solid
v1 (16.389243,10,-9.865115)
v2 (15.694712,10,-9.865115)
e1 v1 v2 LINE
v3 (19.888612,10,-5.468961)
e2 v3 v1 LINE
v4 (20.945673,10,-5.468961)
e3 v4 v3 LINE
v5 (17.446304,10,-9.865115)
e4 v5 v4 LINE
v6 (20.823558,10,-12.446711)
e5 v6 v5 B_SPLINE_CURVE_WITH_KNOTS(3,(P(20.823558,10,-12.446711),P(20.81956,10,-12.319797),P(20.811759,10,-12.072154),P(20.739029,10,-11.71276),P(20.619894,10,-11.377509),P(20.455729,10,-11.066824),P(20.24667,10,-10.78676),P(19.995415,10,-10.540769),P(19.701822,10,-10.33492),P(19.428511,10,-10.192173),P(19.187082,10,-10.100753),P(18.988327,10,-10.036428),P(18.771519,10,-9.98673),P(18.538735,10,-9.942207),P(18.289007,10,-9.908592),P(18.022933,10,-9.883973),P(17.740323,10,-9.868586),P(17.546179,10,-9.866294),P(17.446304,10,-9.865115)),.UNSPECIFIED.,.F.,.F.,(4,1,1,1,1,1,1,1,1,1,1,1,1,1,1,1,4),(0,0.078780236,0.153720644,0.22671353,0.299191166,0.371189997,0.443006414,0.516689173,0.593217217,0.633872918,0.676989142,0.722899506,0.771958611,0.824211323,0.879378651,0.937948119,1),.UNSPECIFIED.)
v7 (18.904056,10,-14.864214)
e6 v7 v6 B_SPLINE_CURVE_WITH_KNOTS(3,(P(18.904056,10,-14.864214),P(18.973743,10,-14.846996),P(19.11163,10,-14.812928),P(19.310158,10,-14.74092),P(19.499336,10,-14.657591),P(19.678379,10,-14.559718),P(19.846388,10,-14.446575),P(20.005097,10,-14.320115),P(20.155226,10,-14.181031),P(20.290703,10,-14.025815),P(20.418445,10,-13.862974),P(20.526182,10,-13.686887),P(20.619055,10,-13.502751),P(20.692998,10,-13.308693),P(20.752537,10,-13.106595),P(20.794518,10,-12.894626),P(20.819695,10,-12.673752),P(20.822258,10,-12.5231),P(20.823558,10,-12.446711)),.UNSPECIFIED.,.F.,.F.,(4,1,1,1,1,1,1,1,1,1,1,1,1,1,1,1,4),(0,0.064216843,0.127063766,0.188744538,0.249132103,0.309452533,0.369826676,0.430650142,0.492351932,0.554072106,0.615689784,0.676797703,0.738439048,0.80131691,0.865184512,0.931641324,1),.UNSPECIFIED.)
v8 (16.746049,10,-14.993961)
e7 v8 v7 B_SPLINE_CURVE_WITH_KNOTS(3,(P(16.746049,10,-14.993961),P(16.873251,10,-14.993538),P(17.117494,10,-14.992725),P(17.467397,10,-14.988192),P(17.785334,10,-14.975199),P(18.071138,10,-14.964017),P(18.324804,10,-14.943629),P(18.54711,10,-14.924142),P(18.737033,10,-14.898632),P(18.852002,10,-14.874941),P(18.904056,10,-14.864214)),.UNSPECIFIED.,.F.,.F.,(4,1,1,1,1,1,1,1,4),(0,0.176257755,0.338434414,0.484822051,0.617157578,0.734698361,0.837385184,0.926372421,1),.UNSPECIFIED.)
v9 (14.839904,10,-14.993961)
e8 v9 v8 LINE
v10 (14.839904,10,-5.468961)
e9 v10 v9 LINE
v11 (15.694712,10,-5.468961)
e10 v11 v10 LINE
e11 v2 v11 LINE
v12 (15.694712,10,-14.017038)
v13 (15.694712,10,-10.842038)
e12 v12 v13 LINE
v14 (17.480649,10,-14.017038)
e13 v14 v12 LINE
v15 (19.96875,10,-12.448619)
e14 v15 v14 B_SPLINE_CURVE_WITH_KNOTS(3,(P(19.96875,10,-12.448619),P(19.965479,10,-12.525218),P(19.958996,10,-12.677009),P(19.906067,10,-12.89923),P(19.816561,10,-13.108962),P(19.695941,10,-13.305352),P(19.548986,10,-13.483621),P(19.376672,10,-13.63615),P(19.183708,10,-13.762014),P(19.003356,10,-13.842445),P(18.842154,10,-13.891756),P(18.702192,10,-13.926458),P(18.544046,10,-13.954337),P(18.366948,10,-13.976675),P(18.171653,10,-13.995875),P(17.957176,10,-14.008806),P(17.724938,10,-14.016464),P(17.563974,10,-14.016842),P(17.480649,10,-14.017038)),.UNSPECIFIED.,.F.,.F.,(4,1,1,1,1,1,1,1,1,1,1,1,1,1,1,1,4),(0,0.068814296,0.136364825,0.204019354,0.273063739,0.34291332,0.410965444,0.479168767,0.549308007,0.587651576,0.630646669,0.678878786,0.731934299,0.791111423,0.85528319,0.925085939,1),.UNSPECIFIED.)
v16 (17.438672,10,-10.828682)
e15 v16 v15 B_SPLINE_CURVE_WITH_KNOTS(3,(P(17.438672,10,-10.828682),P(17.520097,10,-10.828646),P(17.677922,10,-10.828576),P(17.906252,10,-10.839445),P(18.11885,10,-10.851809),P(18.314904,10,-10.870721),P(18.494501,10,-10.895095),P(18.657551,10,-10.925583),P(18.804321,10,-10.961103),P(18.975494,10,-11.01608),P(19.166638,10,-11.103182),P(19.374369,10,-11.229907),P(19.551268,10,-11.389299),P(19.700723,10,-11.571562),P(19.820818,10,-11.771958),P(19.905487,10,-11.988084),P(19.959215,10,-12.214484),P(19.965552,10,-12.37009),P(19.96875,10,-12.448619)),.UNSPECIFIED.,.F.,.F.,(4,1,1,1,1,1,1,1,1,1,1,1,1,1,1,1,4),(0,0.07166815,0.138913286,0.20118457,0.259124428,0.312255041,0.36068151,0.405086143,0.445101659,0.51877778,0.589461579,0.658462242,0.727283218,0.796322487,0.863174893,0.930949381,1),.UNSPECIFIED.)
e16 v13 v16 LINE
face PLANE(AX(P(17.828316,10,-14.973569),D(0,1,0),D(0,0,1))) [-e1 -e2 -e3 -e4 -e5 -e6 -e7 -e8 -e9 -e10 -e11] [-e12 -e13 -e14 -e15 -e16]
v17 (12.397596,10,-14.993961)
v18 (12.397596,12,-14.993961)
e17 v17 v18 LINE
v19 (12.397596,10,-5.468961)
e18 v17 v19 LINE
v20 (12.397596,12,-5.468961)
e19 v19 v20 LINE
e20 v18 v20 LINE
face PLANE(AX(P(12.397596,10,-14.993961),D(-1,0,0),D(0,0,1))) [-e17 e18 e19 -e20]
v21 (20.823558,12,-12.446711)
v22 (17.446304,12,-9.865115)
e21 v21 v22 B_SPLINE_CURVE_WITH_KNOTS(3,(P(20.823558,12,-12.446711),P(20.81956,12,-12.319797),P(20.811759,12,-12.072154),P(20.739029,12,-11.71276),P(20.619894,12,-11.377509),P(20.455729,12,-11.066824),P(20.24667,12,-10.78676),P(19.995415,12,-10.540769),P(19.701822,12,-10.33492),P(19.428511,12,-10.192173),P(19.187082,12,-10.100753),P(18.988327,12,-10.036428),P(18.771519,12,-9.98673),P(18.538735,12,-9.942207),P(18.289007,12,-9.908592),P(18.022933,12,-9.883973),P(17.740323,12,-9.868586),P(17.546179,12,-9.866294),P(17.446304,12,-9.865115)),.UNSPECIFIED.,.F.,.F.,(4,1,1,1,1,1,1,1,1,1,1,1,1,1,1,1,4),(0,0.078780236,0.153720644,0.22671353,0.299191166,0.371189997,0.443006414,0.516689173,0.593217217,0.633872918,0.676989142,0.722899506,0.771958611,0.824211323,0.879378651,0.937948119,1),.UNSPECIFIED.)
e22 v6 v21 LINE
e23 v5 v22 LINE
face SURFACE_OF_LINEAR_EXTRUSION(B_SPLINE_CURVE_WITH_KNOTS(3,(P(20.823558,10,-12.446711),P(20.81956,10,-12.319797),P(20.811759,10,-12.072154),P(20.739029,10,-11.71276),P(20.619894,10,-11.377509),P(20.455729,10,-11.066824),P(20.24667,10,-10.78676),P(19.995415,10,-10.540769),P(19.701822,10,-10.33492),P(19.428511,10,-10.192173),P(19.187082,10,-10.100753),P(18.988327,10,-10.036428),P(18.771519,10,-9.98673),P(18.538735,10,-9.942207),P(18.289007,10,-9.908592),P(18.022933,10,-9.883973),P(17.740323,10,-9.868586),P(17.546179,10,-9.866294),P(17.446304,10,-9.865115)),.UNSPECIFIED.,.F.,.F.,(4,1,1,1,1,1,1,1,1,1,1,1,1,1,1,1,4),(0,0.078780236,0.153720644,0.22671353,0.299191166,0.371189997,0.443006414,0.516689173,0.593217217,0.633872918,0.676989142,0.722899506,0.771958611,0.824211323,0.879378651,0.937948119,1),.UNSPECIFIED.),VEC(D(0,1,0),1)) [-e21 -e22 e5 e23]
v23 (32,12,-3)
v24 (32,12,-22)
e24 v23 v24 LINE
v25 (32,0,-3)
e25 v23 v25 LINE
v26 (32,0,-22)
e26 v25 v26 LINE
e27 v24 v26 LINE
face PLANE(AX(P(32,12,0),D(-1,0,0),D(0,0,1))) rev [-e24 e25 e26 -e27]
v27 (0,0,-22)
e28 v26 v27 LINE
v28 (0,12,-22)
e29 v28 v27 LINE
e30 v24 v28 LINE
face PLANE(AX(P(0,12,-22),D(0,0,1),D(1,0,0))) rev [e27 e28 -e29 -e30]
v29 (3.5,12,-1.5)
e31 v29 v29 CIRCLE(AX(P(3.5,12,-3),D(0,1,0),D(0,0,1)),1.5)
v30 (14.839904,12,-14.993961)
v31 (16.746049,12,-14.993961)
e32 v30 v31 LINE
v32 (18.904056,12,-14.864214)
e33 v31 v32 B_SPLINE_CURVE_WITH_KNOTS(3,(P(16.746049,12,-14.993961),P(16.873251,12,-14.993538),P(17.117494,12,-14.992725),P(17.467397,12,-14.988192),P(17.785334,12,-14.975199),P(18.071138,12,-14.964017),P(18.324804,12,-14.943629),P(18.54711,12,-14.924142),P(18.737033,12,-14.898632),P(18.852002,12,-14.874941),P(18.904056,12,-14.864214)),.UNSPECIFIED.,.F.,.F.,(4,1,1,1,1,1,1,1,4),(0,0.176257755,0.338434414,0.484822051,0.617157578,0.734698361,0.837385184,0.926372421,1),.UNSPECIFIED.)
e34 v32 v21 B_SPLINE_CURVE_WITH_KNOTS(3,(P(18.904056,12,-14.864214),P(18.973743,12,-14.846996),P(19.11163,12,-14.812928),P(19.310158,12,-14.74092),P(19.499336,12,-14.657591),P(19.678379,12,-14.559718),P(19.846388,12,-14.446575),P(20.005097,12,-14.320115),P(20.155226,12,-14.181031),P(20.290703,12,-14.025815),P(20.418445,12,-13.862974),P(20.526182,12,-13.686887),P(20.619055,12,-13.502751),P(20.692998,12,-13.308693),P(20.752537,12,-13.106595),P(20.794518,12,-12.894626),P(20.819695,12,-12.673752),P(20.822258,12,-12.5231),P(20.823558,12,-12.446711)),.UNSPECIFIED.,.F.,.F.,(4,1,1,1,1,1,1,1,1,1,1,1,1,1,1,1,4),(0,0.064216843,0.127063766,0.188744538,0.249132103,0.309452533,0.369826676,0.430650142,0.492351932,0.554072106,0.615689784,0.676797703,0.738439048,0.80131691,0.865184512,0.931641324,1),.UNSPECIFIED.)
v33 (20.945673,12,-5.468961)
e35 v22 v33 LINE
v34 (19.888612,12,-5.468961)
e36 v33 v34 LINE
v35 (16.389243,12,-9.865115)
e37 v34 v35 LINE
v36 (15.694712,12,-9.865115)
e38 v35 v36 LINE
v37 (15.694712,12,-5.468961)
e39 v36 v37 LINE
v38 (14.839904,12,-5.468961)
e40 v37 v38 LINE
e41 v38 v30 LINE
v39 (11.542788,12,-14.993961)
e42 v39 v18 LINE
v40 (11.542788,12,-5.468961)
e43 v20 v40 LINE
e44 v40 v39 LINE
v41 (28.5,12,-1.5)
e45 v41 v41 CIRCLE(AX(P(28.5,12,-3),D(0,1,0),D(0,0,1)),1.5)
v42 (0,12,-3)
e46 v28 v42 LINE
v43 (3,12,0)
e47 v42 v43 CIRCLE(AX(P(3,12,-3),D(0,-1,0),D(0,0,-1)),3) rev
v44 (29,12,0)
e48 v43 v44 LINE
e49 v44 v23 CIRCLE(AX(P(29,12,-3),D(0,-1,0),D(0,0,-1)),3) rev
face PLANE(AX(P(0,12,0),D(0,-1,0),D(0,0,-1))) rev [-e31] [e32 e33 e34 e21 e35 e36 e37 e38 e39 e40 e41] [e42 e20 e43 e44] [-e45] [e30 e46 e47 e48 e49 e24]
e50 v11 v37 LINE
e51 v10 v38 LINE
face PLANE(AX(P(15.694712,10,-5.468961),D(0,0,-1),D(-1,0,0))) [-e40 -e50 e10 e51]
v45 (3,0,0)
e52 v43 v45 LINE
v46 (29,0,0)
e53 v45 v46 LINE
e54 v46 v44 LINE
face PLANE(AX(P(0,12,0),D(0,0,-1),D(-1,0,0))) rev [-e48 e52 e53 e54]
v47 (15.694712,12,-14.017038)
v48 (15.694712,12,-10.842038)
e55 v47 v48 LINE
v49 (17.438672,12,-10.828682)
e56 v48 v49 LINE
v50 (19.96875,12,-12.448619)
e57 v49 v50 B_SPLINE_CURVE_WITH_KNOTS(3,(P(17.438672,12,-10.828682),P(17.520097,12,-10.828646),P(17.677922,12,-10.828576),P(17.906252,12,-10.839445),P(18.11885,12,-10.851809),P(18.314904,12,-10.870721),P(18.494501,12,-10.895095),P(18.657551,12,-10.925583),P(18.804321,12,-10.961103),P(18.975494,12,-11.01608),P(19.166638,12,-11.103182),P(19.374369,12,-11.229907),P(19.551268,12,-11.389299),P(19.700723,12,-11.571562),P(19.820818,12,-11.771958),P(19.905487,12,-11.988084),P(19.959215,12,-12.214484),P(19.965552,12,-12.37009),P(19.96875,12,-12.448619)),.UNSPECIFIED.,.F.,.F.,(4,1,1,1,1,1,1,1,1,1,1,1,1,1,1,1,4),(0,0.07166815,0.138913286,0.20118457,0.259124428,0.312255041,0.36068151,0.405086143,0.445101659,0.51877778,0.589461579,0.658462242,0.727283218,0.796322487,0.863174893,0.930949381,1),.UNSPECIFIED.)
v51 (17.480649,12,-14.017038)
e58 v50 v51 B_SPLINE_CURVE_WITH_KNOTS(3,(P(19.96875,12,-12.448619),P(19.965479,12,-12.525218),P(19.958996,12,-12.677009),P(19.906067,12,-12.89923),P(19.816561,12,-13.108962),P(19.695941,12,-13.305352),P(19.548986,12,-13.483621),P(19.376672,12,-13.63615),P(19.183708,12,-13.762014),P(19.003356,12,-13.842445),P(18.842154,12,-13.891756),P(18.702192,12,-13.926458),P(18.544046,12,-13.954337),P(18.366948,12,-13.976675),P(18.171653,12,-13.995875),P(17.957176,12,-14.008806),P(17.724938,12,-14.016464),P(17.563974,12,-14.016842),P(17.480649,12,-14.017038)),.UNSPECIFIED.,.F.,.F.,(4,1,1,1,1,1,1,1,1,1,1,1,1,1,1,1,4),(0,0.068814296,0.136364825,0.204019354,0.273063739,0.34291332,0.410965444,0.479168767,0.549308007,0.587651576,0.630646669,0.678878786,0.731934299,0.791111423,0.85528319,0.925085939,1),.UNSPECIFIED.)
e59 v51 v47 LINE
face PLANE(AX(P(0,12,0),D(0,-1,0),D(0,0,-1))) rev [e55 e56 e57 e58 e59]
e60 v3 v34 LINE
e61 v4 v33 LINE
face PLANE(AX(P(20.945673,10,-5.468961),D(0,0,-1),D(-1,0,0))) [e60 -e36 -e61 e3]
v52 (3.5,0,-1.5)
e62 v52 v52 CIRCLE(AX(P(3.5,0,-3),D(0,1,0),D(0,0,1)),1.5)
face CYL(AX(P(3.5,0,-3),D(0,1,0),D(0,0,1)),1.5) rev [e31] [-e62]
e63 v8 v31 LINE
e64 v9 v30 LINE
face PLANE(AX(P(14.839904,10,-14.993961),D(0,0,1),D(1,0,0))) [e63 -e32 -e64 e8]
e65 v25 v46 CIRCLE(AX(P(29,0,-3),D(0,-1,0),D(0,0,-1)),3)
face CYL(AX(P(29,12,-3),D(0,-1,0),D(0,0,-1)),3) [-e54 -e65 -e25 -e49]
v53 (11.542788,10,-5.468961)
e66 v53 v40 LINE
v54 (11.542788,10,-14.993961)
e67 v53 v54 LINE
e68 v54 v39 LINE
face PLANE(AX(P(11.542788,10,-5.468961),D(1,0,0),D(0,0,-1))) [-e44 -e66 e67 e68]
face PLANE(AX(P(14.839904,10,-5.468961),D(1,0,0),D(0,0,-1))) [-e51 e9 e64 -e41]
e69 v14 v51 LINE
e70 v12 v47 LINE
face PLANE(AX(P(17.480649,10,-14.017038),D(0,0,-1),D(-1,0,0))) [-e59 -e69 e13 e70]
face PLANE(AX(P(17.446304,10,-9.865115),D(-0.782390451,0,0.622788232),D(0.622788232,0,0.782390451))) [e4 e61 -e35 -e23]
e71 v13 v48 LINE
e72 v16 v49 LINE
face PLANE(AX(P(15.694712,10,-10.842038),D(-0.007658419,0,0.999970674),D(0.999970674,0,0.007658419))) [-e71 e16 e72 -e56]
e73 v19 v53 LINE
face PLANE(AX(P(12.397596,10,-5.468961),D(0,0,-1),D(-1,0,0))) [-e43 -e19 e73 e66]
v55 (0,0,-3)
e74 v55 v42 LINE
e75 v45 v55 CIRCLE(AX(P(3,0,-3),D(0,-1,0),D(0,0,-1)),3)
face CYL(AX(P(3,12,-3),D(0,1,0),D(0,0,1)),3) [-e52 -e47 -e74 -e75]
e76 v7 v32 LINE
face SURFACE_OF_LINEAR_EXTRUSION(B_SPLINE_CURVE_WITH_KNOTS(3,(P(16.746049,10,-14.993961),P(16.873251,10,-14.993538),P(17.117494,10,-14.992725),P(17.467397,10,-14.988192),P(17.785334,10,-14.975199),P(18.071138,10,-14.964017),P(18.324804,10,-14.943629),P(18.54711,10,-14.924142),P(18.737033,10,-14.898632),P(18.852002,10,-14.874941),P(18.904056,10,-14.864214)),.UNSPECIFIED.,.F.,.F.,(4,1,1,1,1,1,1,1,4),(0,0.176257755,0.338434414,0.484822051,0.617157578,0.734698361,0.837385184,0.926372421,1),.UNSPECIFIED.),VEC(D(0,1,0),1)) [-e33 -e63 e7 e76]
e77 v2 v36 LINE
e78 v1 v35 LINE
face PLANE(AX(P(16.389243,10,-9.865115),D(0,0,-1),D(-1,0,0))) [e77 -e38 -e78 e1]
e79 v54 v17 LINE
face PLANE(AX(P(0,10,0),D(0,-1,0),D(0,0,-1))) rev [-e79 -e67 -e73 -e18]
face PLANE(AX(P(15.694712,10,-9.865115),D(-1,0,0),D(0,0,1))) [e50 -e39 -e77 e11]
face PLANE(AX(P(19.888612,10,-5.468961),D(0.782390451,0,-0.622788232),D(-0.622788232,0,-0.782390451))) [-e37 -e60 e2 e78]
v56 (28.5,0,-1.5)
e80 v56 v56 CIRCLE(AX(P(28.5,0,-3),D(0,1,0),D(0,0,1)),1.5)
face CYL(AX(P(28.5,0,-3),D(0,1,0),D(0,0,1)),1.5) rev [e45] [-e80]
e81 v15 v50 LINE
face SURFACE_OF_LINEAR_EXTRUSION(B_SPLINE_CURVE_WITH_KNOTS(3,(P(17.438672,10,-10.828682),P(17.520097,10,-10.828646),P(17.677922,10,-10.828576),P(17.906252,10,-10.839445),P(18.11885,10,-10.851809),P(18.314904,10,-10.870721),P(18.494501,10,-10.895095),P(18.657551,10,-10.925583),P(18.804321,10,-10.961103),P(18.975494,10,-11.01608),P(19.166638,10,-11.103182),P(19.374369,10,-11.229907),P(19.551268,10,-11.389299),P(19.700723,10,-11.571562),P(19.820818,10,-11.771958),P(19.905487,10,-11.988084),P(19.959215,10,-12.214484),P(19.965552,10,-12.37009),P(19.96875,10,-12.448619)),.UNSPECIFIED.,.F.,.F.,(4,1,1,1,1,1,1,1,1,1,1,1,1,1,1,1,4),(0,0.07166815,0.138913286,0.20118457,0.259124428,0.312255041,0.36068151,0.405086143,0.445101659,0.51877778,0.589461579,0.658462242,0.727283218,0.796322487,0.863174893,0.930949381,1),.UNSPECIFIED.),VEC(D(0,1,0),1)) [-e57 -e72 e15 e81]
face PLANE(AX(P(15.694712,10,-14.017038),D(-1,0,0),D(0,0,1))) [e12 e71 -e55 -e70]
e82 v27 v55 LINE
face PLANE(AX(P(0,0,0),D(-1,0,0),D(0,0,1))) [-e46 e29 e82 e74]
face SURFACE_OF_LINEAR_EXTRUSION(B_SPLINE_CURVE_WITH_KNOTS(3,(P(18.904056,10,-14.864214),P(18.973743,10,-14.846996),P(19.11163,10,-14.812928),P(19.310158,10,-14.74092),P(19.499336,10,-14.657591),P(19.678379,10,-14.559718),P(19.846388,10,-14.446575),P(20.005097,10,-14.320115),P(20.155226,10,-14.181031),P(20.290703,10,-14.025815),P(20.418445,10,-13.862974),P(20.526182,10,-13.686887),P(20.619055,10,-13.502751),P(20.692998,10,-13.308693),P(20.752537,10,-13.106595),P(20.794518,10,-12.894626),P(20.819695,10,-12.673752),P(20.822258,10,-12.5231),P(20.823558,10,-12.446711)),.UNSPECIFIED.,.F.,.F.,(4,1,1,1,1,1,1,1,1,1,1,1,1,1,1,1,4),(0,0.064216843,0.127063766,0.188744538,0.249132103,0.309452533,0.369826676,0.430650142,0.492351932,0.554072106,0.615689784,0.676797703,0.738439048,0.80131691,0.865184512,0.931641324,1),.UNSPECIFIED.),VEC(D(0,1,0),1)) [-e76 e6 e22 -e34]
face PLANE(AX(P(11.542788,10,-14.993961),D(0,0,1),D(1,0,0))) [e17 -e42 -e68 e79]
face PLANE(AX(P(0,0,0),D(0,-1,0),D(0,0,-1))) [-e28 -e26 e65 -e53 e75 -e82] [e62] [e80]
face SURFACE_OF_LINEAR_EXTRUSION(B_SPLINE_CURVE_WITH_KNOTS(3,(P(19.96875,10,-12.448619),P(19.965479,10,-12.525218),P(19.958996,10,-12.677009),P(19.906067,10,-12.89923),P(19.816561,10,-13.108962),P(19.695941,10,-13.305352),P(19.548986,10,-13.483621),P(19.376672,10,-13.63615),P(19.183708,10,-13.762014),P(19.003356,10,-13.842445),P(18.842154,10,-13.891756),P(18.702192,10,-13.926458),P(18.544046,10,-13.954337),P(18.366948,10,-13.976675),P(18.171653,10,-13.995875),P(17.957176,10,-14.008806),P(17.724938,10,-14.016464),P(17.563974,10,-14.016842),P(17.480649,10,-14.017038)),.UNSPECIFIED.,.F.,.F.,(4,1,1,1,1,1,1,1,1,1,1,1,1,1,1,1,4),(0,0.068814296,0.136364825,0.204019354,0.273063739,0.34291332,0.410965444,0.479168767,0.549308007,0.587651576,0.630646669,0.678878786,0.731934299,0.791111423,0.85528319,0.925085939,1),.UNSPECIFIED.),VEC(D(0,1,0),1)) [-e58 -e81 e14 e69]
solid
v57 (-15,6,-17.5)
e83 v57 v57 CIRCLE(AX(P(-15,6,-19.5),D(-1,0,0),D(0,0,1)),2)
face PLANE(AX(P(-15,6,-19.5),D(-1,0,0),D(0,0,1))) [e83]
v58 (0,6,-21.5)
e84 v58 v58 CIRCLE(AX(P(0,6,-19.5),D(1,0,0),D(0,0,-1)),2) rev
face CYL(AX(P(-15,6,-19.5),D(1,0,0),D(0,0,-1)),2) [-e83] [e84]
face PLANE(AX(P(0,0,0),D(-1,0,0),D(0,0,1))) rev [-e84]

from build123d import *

# Parameters (mm, degrees)
SKETCH1_W           = 32
SKETCH1_H           = 22
BOSS_EXTRUDE1_DEPTH = 12
SKETCH2_R           = 2
BOSS_EXTRUDE2_DEPTH = 15
SKETCH3_R           = 1.5
CUT_EXTRUDE1_DEPTH  = 41.644802866
SKETCH4_W           = 0.854807692
SKETCH4_H           = 9.525
CUT_EXTRUDE2_DEPTH  = 2
FILLET1_R           = 3


with BuildPart() as part:
    # Sketch1 → Boss-Extrude1 (new body)
    with BuildSketch(Plane(origin=(0, 0, 0), x_dir=(1, 0, 0), z_dir=(0, 1, 0))):
        with Locations((16, 11)):
            Rectangle(SKETCH1_W, SKETCH1_H)
    extrude(amount=BOSS_EXTRUDE1_DEPTH)

    # Sketch2 → Boss-Extrude2 (add)
    with BuildSketch(Plane.ZY):
        with Locations((-19.5, 6)):
            Circle(SKETCH2_R)
    extrude(amount=BOSS_EXTRUDE2_DEPTH)

    # Sketch3 → Cut-Extrude1 (cut, through all)
    with BuildSketch(Plane(origin=(0, 12, 0), x_dir=(1, 0, 0), z_dir=(0, 1, 0))):
        with Locations((3.5, 3)):
            Circle(SKETCH3_R)
        with Locations((28.5, 3)):
            Circle(SKETCH3_R)
    extrude(amount=-CUT_EXTRUDE1_DEPTH, mode=Mode.SUBTRACT)

    # Sketch4 → Cut-Extrude2 (cut)
    # profile 1 of 2: a face of its own
    with BuildSketch(Plane(origin=(0, 12, 0), x_dir=(1, 0, 0), z_dir=(0, 1, 0))):
        with Locations((11.970192308, 10.231461459)):
            Rectangle(SKETCH4_W, SKETCH4_H)
    # profile 2 of 2: a face of its own
    with BuildSketch(Plane(origin=(0, 12, 0), x_dir=(1, 0, 0), z_dir=(0, 1, 0))):
        with BuildLine():
            Line((14.839903846, 14.993961459), (16.746048678, 14.993961459))
            add(Edge.make_bspline(
                [(16.746048678, 14.993961459), (16.87325132, 14.993538043), (17.117494485, 14.992725037), (17.467397456, 14.988191782), (17.785334056, 14.975198714), (18.071138047, 14.964017498), (18.324804187, 14.943628715), (18.547110314, 14.924141525), (18.737032548, 14.898631777), (18.852001615, 14.87494059), (18.90405649, 14.864213863)],
                knots=[0, 0, 0, 0, 1.410062039, 2.707475311, 3.878576406, 4.937260626, 5.877586885, 6.699081471, 7.410979367, 8, 8, 8, 8], degree=3))
            add(Edge.make_bspline(
                [(18.90405649, 14.864213863), (18.973743089, 14.846996023), (19.111629682, 14.812927646), (19.310158076, 14.740919733), (19.499336343, 14.657590611), (19.678378651, 14.559717915), (19.846388197, 14.446575122), (20.005097314, 14.320115446), (20.155226182, 14.181030836), (20.290703333, 14.025814589), (20.418444609, 13.862973802), (20.526182228, 13.686887149), (20.619055005, 13.502751135), (20.692997627, 13.308693091), (20.752536969, 13.106594983), (20.794518377, 12.894626186), (20.819694824, 12.67375239), (20.822258016, 12.523099795), (20.823557692, 12.446710858)],
                knots=[0, 0, 0, 0, 1.027469482, 2.033020251, 3.019912614, 3.986113645, 4.951240523, 5.91722682, 6.890402269, 7.87763091, 8.8651537, 9.85103654, 10.82876324, 11.815024772, 12.821070561, 13.842952187, 14.906261191, 16, 16, 16, 16], degree=3))
            add(Edge.make_bspline(
                [(20.823557692, 12.446710858), (20.819559919, 12.319796752), (20.811759227, 12.07215446), (20.739028767, 11.712760204), (20.619894095, 11.377509283), (20.455728573, 11.066823819), (20.246669857, 10.786759848), (19.995414533, 10.54076868), (19.701822433, 10.334920061), (19.428511223, 10.1921735), (19.187081865, 10.100752798), (18.988326921, 10.036428136), (18.771518932, 9.986729502), (18.538735186, 9.942206572), (18.289006952, 9.908592318), (18.022932774, 9.883972657), (17.740322889, 9.868585568), (17.546178708, 9.866294111), (17.446304087, 9.865115305)],
                knots=[0, 0, 0, 0, 1.260483769, 2.459530307, 3.627416485, 4.787058657, 5.939039949, 7.08810263, 8.267026773, 9.491475466, 10.141966685, 10.831826277, 11.566392101, 12.351337768, 13.187381173, 14.07005841, 15.007169909, 16, 16, 16, 16], degree=3))
            Line((17.446304087, 9.865115305), (20.945673077, 5.468961459))
            Line((20.945673077, 5.468961459), (19.888611779, 5.468961459))
            Line((19.888611779, 5.468961459), (16.389242788, 9.865115305))
            Line((16.389242788, 9.865115305), (15.694711538, 9.865115305))
            Line((15.694711538, 9.865115305), (15.694711538, 5.468961459))
            Line((15.694711538, 5.468961459), (14.839903846, 5.468961459))
            Line((14.839903846, 5.468961459), (14.839903846, 14.993961459))
        make_face()
        with BuildLine():
            Line((15.694711538, 14.017038382), (15.694711538, 10.842038382))
            Line((15.694711538, 10.842038382), (17.438671875, 10.828682012))
            add(Edge.make_bspline(
                [(17.438671875, 10.828682012), (17.520097124, 10.82864599), (17.677922447, 10.828576167), (17.906252113, 10.839444944), (18.118850417, 10.85180926), (18.314904179, 10.870721408), (18.49450098, 10.895094717), (18.657551055, 10.925582839), (18.80432056, 10.961103095), (18.97549444, 11.016080377), (19.166638143, 11.103182469), (19.374368759, 11.229907148), (19.551267978, 11.389298822), (19.700723017, 11.571562299), (19.820818113, 11.77195809), (19.905487347, 11.988084066), (19.959214993, 12.214484058), (19.965551963, 12.370090195), (19.96875, 12.448618911)],
                knots=[0, 0, 0, 0, 1.146690395, 2.22261258, 3.21895312, 4.145990853, 4.996080663, 5.770904154, 6.481378293, 7.121626537, 8.300444488, 9.431385265, 10.535395872, 11.636531494, 12.74115979, 13.810798291, 14.895190096, 16, 16, 16, 16], degree=3))
            add(Edge.make_bspline(
                [(19.96875, 12.448618911), (19.965478513, 12.525217801), (19.95899562, 12.677008851), (19.906067186, 12.899229578), (19.816561084, 13.108961778), (19.695941279, 13.305352269), (19.548986436, 13.48362145), (19.376671532, 13.636149774), (19.183708108, 13.762014389), (19.003355775, 13.842444524), (18.842154097, 13.891756411), (18.702191951, 13.926457792), (18.544045715, 13.954337382), (18.366947502, 13.976675034), (18.17165335, 13.995874561), (17.957175792, 14.008806187), (17.72493784, 14.016463917), (17.563973692, 14.016842438), (17.480649038, 14.017038382)],
                knots=[0, 0, 0, 0, 1.101028733, 2.181837193, 3.264309656, 4.369019818, 5.486613113, 6.575447106, 7.666700264, 8.788928104, 9.402425223, 10.0903467, 10.862060571, 11.710948788, 12.657782767, 13.684531032, 14.801375019, 16, 16, 16, 16], degree=3))
            Line((17.480649038, 14.017038382), (15.694711538, 14.017038382))
        make_face(mode=Mode.SUBTRACT)
    extrude(amount=-CUT_EXTRUDE2_DEPTH, mode=Mode.SUBTRACT)


with BuildPart() as body_2:
    # Split1: the piece on the far side of the plane
    add(part.part)
    split(bisect_by=Plane(origin=(0, 12, 0), x_dir=(0, 0, 1), z_dir=(1, 0, 0)), keep=Keep.BOTTOM)


with BuildPart() as part_1:
    add(part.part)

    # Split1
    split(bisect_by=Plane(origin=(0, 12, 0), x_dir=(0, 0, 1), z_dir=(1, 0, 0)), keep=Keep.TOP)

    # Fillet1
    fillet1_edges = [part_1.edges().sort_by_distance(p)[0] for p in [
        (32, 6, 0),
        (0, 6, 0),
    ]]
    fillet(fillet1_edges, radius=FILLET1_R)


solid = Compound([body_2.part, part_1.part])
